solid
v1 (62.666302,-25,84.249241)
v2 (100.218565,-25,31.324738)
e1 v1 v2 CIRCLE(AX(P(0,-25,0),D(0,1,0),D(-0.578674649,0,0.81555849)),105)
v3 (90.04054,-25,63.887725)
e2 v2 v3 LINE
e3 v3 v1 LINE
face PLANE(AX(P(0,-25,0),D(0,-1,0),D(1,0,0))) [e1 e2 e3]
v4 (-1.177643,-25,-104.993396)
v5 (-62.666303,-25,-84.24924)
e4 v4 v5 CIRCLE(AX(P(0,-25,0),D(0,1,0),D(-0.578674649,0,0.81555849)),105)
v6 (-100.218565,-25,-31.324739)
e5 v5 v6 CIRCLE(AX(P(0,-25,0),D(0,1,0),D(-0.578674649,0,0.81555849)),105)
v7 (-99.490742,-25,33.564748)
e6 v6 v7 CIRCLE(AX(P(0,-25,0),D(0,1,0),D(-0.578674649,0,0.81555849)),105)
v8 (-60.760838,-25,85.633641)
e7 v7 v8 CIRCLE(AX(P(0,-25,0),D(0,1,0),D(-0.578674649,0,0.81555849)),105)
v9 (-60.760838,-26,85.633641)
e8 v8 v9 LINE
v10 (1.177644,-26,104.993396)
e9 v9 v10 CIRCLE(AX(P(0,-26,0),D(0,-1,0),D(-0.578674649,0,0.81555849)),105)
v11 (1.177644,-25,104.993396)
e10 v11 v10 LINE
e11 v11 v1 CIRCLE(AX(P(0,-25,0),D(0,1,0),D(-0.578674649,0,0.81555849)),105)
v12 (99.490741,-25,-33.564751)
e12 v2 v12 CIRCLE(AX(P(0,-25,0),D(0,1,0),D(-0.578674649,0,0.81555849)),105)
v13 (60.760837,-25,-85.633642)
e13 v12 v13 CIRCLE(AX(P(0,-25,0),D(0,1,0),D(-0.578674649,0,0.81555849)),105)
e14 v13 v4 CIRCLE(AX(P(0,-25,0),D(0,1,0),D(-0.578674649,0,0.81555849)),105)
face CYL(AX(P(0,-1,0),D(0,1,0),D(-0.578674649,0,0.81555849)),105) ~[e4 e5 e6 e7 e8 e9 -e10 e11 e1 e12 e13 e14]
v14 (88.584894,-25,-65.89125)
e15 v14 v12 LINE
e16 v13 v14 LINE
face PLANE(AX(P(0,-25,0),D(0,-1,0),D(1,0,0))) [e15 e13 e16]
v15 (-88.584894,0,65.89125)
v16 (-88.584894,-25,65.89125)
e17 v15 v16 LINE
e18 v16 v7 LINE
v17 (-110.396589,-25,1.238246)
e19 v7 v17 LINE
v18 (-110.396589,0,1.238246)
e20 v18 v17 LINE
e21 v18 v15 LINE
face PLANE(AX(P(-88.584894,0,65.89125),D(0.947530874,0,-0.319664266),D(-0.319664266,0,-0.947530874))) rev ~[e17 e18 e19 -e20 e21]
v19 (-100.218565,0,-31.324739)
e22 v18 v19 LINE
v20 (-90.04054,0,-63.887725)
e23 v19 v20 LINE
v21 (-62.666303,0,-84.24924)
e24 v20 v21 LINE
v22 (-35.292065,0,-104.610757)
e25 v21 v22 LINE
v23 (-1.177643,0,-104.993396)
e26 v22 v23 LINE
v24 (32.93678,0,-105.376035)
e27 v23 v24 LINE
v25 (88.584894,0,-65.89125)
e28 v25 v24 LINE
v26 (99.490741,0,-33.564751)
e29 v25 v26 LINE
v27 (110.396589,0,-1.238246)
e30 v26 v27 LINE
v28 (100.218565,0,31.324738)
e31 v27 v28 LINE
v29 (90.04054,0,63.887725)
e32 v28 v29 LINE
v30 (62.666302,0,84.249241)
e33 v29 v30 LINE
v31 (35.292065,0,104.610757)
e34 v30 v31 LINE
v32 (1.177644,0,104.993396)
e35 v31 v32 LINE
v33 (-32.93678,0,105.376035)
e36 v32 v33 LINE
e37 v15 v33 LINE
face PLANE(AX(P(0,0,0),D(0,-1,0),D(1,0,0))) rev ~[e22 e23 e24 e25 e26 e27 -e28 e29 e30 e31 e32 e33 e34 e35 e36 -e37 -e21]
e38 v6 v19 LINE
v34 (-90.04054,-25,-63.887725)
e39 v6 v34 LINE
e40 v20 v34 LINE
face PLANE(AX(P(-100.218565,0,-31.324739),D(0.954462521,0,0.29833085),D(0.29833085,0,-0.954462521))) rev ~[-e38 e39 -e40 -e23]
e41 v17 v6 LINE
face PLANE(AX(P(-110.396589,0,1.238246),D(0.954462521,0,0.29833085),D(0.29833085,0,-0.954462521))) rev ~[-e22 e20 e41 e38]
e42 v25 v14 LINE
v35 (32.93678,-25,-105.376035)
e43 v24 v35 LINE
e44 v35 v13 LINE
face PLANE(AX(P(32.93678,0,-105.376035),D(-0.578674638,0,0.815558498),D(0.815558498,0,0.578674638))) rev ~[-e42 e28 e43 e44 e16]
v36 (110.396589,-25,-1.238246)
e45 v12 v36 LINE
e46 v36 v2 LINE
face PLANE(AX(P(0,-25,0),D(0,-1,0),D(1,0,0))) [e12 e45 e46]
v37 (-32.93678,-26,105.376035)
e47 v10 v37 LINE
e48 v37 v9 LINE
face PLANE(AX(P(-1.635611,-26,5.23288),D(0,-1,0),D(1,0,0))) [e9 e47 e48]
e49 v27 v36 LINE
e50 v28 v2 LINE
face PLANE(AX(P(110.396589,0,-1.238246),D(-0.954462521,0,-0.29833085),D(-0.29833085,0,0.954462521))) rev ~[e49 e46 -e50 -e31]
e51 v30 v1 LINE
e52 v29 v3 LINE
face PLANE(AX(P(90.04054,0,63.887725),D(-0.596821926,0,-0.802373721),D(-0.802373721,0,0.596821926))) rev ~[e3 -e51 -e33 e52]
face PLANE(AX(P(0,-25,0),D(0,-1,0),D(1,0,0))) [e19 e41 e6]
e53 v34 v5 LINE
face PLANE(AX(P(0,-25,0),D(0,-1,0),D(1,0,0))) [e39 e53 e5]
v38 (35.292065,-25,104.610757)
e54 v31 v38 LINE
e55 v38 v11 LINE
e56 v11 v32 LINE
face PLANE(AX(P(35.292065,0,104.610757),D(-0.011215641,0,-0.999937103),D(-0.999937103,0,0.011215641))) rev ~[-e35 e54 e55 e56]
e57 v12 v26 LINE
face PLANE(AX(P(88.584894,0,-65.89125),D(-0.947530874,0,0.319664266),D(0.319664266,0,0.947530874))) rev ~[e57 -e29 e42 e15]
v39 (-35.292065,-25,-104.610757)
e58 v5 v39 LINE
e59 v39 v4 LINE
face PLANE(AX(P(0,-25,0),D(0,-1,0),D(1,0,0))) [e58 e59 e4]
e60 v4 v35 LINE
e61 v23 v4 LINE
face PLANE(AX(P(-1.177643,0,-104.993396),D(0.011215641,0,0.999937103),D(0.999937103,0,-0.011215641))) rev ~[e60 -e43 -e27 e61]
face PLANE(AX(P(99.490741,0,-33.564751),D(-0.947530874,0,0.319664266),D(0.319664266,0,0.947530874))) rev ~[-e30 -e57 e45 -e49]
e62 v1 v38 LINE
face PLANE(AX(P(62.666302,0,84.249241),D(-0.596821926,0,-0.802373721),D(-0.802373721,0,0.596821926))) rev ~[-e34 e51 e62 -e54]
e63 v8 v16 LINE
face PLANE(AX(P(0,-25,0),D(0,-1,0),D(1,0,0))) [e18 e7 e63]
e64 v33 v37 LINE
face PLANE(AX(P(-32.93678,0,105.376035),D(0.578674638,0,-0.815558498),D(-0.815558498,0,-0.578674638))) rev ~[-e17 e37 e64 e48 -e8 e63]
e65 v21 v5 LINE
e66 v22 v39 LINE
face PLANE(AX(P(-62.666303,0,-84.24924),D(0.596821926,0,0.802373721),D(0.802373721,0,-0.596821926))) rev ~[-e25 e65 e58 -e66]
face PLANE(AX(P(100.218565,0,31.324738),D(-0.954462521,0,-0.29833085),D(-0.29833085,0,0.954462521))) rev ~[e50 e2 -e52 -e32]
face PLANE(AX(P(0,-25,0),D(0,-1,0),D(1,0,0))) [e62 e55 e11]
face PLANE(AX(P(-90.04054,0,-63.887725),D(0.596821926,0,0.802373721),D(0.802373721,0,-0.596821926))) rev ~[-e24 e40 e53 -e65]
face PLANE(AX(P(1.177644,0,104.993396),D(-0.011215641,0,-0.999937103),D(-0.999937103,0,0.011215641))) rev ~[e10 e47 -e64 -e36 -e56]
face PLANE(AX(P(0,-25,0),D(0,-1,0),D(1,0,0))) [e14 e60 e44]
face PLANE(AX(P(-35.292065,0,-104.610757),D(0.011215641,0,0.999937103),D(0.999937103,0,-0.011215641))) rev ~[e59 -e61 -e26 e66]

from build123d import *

# Parameters (mm, degrees)
F1_DEPTH = 1
F2_DEPTH = 25


with BuildPart() as f1:
    # F0 (on Front) → F1 (new body)
    with BuildSketch(Plane.XZ):
        with BuildLine():
            ThreePointArc((99.4907408065, -33.5647507629), (103.6135314153, -17.0069429252), (105, 0))
            ThreePointArc((105, 0), (103.7977584549, 15.8437792124), (100.2185649575, 31.3247384325))
            ThreePointArc((100.2185649575, 31.3247384325), (85.6336425012, 60.7608366629), (62.6663022671, 84.2492407097))
            ThreePointArc((62.6663022671, 84.2492407097), (33.5647485771, 99.4907415439), (1.1776435614, 104.9933957716))
            ThreePointArc((1.1776435614, 104.9933957716), (-31.3247392722, 100.218564695), (-60.7608381292, 85.6336414608))
            ThreePointArc((-60.7608381292, 85.6336414608), (-84.2492404255, 62.6663026493), (-99.4907409959, 33.5647502014))
            ThreePointArc((-99.4907409959, 33.5647502014), (-104.9933957718, 1.1776435403), (-100.2185647541, -31.3247390832))
            ThreePointArc((-100.2185647541, -31.3247390832), (-85.6336424849, -60.7608366859), (-62.6663027691, -84.2492403363))
            ThreePointArc((-62.6663027691, -84.2492403363), (-33.5647485613, -99.4907415492), (-1.1776429024, -104.9933957789))
            ThreePointArc((-1.1776429024, -104.9933957789), (31.3247396024, -100.2185645918), (60.7608381561, -85.6336414417))
            ThreePointArc((60.7608381561, -85.6336414417), (84.2492402585, -62.6663028738), (99.4907408065, -33.5647507629))
        make_face()
        with BuildLine():
            ThreePointArc((-60.7608381292, 85.6336414608), (-31.3247392722, 100.218564695), (1.1776435614, 104.9933957716))
            Line((1.1776435614, 104.9933957716), (-32.9367799888, 105.3760349567))
            Line((-32.9367799888, 105.3760349567), (-60.7608381292, 85.6336414608))
        make_face()
    extrude(amount=F1_DEPTH)

    # F0 (on Front) + F1_face (on face) → F2 (join)
    with BuildSketch(Plane.XZ):
        with BuildLine():
            ThreePointArc((99.4907408065, -33.5647507629), (103.6135314153, -17.0069429252), (105, 0))
            ThreePointArc((105, 0), (103.7977584549, 15.8437792124), (100.2185649575, 31.3247384325))
            ThreePointArc((100.2185649575, 31.3247384325), (85.6336425012, 60.7608366629), (62.6663022671, 84.2492407097))
            ThreePointArc((62.6663022671, 84.2492407097), (33.5647485771, 99.4907415439), (1.1776435614, 104.9933957716))
            ThreePointArc((1.1776435614, 104.9933957716), (-31.3247392722, 100.218564695), (-60.7608381292, 85.6336414608))
            ThreePointArc((-60.7608381292, 85.6336414608), (-84.2492404255, 62.6663026493), (-99.4907409959, 33.5647502014))
            ThreePointArc((-99.4907409959, 33.5647502014), (-104.9933957718, 1.1776435403), (-100.2185647541, -31.3247390832))
            ThreePointArc((-100.2185647541, -31.3247390832), (-85.6336424849, -60.7608366859), (-62.6663027691, -84.2492403363))
            ThreePointArc((-62.6663027691, -84.2492403363), (-33.5647485613, -99.4907415492), (-1.1776429024, -104.9933957789))
            ThreePointArc((-1.1776429024, -104.9933957789), (31.3247396024, -100.2185645918), (60.7608381561, -85.6336414417))
            ThreePointArc((60.7608381561, -85.6336414417), (84.2492402585, -62.6663028738), (99.4907408065, -33.5647507629))
        make_face()
        with BuildLine():
            ThreePointArc((100.2185649575, 31.3247384325), (103.7977584549, 15.8437792124), (105, 0))
            ThreePointArc((105, 0), (103.6135314153, -17.0069429252), (99.4907408065, -33.5647507629))
            Line((99.4907408065, -33.5647507629), (110.3965894634, -1.2382463674))
            Line((110.3965894634, -1.2382463674), (100.2185649575, 31.3247384325))
        make_face()
        with BuildLine():
            ThreePointArc((62.6663022671, 84.2492407097), (85.6336425012, 60.7608366629), (100.2185649575, 31.3247384325))
            Line((100.2185649575, 31.3247384325), (90.0405399504, 63.8877248356))
            Line((90.0405399504, 63.8877248356), (62.6663022671, 84.2492407097))
        make_face()
        with BuildLine():
            Line((88.5848940435, -65.8912495444), (99.4907408065, -33.5647507629))
            ThreePointArc((99.4907408065, -33.5647507629), (84.2492402585, -62.6663028738), (60.7608381561, -85.6336414417))
            Line((60.7608381561, -85.6336414417), (88.5848940435, -65.8912495444))
        make_face()
        with BuildLine():
            ThreePointArc((1.1776435614, 104.9933957716), (33.5647485771, 99.4907415439), (62.6663022671, 84.2492407097))
            Line((62.6663022671, 84.2492407097), (35.2920645417, 104.6107566152))
            Line((35.2920645417, 104.6107566152), (1.1776435614, 104.9933957716))
        make_face()
        with BuildLine():
            Line((32.9367799888, -105.3760349567), (60.7608381561, -85.6336414417))
            ThreePointArc((60.7608381561, -85.6336414417), (31.3247396024, -100.2185645918), (-1.1776429024, -104.9933957789))
            Line((-1.1776429024, -104.9933957789), (32.9367799888, -105.3760349567))
        make_face()
        with BuildLine():
            ThreePointArc((-60.7608381292, 85.6336414608), (-31.3247392722, 100.218564695), (1.1776435614, 104.9933957716))
            Line((1.1776435614, 104.9933957716), (-32.9367799888, 105.3760349567))
            Line((-32.9367799888, 105.3760349567), (-60.7608381292, 85.6336414608))
        make_face()
        with BuildLine():
            Line((-35.2920645417, -104.6107566152), (-1.1776429024, -104.9933957789))
            ThreePointArc((-1.1776429024, -104.9933957789), (-33.5647485613, -99.4907415492), (-62.6663027691, -84.2492403363))
            Line((-62.6663027691, -84.2492403363), (-35.2920645417, -104.6107566152))
        make_face()
        with BuildLine():
            ThreePointArc((-99.4907409959, 33.5647502014), (-84.2492404255, 62.6663026493), (-60.7608381292, 85.6336414608))
            Line((-60.7608381292, 85.6336414608), (-88.5848940435, 65.8912495444))
            Line((-88.5848940435, 65.8912495444), (-99.4907409959, 33.5647502014))
        make_face()
        with BuildLine():
            Line((-90.0405399504, -63.8877248356), (-62.6663027691, -84.2492403363))
            ThreePointArc((-62.6663027691, -84.2492403363), (-85.6336424849, -60.7608366859), (-100.2185647541, -31.3247390832))
            Line((-100.2185647541, -31.3247390832), (-90.0405399504, -63.8877248356))
        make_face()
        with BuildLine():
            ThreePointArc((-100.2185647541, -31.3247390832), (-104.9933957718, 1.1776435403), (-99.4907409959, 33.5647502014))
            Line((-99.4907409959, 33.5647502014), (-110.3965894634, 1.2382463674))
            Line((-110.3965894634, 1.2382463674), (-100.2185647541, -31.3247390832))
        make_face()
    with BuildSketch(Plane(origin=(-0.1080602071, -1, 0.3457215964), x_dir=(1, 0, 0), z_dir=(0, -1, 0))):
        with BuildLine():
            Line((1.2857037684, 104.6476741752), (-32.8287197817, 105.0303133603))
            Line((-32.8287197817, 105.0303133603), (-60.6527779221, 85.2879198644))
            ThreePointArc((-60.6527779221, 85.2879198644), (31.4327994792, -100.5642862914), (1.2857037684, 104.6476741752))
        make_face()
    extrude(amount=F2_DEPTH)


solid = f1.part
